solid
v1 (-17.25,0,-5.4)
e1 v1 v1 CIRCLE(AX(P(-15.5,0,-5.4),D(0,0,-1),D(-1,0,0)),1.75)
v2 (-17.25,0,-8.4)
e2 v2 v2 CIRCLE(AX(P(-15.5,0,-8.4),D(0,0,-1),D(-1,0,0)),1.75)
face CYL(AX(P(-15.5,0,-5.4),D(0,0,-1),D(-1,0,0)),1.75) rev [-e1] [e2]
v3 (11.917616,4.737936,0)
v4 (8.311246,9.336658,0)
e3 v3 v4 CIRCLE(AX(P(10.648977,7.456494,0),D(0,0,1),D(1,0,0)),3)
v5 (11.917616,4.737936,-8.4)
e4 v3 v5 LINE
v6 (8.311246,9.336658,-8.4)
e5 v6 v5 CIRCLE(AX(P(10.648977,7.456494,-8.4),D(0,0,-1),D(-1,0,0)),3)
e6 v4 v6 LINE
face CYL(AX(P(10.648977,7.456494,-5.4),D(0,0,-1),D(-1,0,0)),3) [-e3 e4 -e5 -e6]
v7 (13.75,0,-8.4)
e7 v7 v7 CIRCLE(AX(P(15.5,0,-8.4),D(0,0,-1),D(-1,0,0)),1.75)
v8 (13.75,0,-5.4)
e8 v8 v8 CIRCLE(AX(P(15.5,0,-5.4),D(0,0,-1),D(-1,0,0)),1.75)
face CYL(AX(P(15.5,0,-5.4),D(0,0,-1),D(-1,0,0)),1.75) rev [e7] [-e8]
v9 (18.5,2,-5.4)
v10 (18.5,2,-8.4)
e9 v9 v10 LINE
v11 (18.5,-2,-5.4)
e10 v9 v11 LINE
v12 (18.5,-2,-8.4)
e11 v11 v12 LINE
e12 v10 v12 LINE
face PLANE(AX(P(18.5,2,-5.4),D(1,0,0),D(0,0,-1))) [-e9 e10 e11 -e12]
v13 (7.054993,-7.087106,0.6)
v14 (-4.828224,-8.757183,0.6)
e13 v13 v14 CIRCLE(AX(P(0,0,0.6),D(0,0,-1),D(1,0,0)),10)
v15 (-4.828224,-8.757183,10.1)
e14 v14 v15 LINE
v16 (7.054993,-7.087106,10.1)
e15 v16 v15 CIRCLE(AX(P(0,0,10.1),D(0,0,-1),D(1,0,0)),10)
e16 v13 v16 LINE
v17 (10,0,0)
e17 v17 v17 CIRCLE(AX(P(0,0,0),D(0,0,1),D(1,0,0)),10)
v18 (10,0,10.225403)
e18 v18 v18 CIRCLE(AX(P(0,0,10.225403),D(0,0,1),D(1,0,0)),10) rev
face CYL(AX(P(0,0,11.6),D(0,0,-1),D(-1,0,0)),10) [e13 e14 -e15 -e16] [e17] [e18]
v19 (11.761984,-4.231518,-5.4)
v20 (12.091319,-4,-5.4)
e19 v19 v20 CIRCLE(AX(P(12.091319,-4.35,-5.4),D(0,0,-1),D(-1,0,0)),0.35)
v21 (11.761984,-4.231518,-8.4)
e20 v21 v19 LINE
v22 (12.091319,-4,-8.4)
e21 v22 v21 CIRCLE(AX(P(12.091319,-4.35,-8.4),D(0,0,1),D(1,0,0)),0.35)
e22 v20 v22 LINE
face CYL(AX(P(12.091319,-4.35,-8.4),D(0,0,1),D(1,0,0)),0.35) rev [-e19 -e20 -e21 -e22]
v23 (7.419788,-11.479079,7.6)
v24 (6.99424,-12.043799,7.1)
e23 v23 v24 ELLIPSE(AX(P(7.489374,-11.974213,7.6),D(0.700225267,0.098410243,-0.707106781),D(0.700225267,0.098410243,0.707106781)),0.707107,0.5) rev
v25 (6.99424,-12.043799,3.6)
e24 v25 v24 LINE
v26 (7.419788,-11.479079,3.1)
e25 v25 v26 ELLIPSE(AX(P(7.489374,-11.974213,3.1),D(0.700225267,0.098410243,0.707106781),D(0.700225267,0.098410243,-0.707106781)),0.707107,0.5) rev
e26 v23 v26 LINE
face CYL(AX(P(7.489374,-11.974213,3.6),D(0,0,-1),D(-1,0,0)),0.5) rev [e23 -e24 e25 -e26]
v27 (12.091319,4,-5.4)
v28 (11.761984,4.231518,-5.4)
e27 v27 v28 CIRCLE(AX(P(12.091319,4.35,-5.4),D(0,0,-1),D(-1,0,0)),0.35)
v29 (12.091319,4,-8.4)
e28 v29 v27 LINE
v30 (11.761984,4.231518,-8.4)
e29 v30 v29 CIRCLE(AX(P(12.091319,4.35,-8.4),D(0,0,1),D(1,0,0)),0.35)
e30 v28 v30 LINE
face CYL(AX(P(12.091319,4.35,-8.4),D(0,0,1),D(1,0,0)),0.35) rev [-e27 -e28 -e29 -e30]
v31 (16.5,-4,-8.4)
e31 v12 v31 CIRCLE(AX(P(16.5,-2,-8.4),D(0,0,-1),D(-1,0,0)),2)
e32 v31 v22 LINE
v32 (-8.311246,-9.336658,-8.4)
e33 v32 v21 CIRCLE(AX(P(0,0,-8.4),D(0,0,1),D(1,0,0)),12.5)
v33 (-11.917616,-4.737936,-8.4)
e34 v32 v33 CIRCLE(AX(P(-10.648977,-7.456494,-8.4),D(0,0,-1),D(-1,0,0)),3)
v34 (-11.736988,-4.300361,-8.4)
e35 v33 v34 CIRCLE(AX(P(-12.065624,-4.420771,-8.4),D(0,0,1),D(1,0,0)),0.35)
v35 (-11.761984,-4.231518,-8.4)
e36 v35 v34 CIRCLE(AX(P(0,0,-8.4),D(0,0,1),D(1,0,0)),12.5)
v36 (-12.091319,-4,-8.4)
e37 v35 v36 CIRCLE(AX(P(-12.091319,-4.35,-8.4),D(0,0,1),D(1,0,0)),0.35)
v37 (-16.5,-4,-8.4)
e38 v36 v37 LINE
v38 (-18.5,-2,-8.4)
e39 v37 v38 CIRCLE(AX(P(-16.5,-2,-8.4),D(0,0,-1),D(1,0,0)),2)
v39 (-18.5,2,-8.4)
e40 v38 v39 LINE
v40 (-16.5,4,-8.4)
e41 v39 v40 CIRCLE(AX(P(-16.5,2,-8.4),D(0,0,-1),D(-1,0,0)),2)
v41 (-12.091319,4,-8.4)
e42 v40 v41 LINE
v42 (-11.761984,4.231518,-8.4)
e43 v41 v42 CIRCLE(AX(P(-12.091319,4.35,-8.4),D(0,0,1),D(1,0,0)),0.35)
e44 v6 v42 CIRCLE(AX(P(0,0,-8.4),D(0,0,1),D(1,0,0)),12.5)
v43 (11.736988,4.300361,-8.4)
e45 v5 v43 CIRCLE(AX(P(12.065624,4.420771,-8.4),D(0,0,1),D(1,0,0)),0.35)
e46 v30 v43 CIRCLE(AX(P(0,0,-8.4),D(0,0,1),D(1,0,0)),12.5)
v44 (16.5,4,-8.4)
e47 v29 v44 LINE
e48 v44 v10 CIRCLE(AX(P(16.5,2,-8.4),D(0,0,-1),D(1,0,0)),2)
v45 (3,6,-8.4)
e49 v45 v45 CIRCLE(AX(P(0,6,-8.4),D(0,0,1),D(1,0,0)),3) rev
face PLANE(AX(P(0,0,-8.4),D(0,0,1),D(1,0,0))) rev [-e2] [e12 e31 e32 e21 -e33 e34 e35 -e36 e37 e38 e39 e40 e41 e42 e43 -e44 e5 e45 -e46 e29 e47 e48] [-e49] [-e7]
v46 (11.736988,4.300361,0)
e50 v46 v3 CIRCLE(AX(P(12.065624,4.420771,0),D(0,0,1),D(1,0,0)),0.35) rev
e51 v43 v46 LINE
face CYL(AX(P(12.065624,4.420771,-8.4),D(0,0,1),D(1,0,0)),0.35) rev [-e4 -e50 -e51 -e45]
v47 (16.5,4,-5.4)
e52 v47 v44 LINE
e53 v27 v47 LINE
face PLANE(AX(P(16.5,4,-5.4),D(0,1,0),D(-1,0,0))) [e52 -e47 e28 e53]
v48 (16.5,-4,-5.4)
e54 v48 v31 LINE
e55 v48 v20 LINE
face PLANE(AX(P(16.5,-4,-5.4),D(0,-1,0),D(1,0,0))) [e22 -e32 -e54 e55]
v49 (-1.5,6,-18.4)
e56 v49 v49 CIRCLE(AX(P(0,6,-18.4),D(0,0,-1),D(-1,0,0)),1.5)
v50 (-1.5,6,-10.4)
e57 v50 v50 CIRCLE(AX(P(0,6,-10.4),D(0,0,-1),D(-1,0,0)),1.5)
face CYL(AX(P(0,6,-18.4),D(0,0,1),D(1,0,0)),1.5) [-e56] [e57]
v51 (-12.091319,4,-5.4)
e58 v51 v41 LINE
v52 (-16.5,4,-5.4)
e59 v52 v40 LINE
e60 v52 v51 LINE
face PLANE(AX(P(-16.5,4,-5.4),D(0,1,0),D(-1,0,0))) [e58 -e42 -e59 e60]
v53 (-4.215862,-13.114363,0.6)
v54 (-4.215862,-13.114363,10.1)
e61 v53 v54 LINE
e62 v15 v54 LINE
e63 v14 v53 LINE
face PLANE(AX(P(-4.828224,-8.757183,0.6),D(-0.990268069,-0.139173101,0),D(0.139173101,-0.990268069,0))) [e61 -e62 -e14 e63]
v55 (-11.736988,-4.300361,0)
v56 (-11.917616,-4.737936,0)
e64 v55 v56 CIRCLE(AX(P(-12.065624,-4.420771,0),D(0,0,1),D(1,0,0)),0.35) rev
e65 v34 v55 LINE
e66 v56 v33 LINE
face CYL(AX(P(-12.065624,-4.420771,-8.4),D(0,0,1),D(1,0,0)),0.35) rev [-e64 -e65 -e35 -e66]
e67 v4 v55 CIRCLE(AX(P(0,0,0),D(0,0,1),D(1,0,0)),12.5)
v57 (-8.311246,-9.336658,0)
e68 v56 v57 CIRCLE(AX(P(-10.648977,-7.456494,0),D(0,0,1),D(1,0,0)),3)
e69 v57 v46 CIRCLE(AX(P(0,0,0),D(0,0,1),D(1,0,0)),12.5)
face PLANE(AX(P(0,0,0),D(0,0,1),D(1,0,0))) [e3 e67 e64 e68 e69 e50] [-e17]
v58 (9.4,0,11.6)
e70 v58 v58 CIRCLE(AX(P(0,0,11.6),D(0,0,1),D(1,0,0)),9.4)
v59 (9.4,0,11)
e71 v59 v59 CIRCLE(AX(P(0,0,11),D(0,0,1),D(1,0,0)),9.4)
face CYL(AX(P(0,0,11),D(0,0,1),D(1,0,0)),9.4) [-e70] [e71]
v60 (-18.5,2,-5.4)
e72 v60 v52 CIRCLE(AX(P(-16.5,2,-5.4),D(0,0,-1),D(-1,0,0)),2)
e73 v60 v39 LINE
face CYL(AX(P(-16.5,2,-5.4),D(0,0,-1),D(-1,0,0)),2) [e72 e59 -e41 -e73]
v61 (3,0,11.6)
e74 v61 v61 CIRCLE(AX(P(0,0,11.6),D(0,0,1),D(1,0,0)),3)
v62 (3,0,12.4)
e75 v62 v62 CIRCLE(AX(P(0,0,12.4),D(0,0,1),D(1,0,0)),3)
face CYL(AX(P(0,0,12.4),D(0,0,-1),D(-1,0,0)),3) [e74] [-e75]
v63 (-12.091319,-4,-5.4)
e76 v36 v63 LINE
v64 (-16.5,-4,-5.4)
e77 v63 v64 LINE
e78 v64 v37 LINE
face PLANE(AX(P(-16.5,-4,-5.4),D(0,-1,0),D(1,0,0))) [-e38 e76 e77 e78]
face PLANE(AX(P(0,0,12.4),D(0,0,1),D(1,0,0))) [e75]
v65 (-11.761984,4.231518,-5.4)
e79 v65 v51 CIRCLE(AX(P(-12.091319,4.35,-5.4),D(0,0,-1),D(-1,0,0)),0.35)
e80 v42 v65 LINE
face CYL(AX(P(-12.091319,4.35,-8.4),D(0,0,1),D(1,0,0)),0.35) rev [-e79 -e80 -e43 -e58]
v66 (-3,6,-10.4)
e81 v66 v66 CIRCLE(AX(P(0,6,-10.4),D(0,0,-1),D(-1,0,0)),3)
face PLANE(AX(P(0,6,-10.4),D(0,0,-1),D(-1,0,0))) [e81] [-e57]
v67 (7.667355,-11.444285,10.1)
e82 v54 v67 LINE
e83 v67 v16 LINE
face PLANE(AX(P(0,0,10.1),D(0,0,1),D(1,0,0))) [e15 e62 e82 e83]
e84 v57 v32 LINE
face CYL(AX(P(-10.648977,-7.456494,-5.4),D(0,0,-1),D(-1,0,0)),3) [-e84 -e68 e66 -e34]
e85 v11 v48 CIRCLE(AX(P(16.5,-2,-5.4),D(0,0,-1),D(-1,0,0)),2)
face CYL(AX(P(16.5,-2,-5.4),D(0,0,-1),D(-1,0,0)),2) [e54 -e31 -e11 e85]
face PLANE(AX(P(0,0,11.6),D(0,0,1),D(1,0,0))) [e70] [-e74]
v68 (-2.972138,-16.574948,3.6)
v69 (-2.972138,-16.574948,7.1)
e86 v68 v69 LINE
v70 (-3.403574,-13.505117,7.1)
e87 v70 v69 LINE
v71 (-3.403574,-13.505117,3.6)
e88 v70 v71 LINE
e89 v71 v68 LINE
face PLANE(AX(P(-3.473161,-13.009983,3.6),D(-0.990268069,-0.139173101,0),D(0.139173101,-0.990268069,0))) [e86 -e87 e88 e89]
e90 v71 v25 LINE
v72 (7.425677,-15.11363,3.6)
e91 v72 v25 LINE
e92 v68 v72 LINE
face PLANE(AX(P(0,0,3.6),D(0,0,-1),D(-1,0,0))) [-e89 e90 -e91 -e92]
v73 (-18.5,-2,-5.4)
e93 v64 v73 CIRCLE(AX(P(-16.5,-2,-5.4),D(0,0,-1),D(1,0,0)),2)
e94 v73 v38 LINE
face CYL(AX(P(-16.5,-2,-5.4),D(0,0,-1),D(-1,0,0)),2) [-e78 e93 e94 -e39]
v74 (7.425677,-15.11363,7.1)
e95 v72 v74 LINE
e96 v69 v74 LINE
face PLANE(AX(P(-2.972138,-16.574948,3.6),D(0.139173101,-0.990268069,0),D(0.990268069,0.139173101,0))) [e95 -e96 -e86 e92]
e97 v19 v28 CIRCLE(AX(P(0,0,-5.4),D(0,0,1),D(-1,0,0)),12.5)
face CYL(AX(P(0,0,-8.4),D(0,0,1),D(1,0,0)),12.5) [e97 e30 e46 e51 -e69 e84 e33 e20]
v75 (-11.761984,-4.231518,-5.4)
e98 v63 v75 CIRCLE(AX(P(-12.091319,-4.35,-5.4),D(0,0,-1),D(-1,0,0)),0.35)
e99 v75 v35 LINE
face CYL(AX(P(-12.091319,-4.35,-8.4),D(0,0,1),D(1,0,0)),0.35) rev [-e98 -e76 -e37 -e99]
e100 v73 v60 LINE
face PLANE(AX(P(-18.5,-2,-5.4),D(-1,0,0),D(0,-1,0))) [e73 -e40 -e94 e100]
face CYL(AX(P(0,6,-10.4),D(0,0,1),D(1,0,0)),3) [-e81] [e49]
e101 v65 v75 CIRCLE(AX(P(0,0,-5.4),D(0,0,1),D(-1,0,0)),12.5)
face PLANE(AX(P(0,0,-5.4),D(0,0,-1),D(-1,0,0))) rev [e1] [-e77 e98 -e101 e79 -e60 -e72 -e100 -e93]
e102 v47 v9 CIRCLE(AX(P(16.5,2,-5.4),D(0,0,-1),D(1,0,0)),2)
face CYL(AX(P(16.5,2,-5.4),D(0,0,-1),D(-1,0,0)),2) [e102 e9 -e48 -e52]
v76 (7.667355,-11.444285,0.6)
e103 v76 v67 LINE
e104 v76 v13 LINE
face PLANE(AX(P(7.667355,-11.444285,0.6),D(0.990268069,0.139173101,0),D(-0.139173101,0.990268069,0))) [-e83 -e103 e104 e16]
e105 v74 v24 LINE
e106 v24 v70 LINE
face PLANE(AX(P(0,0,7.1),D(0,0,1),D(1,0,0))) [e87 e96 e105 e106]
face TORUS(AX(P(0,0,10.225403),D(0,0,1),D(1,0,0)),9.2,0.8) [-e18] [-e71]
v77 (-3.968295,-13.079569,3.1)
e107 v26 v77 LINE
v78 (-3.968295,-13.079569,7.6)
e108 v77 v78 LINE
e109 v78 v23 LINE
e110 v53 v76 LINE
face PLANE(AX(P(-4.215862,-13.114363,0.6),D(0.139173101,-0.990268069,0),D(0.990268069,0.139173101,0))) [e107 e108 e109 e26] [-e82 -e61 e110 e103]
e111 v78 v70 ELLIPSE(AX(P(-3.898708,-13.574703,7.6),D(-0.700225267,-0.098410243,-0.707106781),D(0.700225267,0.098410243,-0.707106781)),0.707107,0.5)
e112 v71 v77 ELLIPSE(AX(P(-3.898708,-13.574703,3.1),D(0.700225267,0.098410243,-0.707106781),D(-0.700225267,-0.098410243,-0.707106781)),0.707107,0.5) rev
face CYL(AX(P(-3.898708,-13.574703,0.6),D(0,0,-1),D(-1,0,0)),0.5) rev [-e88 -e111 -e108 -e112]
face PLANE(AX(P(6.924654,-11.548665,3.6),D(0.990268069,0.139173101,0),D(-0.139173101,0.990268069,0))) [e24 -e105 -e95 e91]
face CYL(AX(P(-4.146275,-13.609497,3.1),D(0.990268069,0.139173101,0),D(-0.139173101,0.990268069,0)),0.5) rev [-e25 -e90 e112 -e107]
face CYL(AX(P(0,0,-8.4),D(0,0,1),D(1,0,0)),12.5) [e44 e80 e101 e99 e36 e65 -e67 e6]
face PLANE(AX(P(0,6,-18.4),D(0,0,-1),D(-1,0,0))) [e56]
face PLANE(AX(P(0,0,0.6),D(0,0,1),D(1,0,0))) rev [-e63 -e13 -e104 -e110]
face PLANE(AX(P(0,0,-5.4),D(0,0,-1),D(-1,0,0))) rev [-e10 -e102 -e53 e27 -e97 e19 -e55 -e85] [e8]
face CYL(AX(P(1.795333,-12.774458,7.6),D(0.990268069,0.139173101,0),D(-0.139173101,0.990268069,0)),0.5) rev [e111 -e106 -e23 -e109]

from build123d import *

# Parameters (mm, degrees)
SKETCH_1_R          = 10
EXTRUDE_1_DEPTH     = 11.6
SKETCH_2_R          = 12.5
EXTRUDE_2_DEPTH     = 8.4
EXTRUDE_START       = -3
SKETCH_3_R          = 1.75
SKETCH_3_R_2        = 1.749999999999227
EXTRUDE_3_DEPTH     = 3
EXTRUDE_START_2     = 5.4
EXTRUDE_4_DEPTH     = 5.4
SKETCH_5_R          = 3.000000000000001
EXTRUDE_5_DEPTH     = 2
SKETCH_6_R          = 1.5000000000000002
EXTRUDE_6_DEPTH     = 8
SKETCH_7_R          = 3
EXTRUDE_7_DEPTH     = 0.8
EXTRUDE_START_3     = -11
EXTRUDE_8_DEPTH     = 11
EXTRUDE_9_DEPTH     = 8
CUT_EXTRUDE_1_DEPTH = 4.5
FILLET_1_R          = 0.5
FILLET_4_R          = 0.35
CUT_EXTRUDE_START   = -1.5
CUT_EXTRUDE_2_DEPTH = 1.5
CUT_EXTRUDE_START_2 = -0.6
SKETCH_12_R         = 10
SKETCH_12_R_2       = 9.4
CUT_EXTRUDE_3_DEPTH = 0.6
FILLET_5_R          = 0.8


with BuildPart() as part:
    # ｽｹｯﾁ1 → ﾎﾞｽ - 押し出し1 (new body)
    with BuildSketch(Plane.XY):
        Circle(SKETCH_1_R)
    extrude(amount=EXTRUDE_1_DEPTH)

    # ｽｹｯﾁ2 → ﾎﾞｽ - 押し出し2 (add)
    with BuildSketch(Plane.XY):
        Circle(SKETCH_2_R)
    extrude(amount=-EXTRUDE_2_DEPTH)

    # ｽｹｯﾁ3 → ﾎﾞｽ - 押し出し3 (add)
    # profile 1 of 4: a face of its own
    with BuildSketch(Plane(origin=(0, 0, -8.4), x_dir=(-1, 0, 0), z_dir=(0, 0, -1)).offset(EXTRUDE_START)):
        with BuildLine():
            Line((-18.500000000000004, 2.0000000000000004), (-18.500000000000004, -2.0000000000000004))
            ThreePointArc((-18.500000000000004, -2.0000000000000004), (-17.914213562373096, -3.4142135623730976), (-16.5, -4))
            Line((-16.5, -4), (-11.842719282327012, -4.000000000000001))
            ThreePointArc((-11.842719282327012, -4.000000000000001), (-12.500000000000002, 1.53e-15), (-11.842719282327012, 4.000000000000001))
            Line((-11.842719282327012, 4.000000000000001), (-16.5, 4))
            ThreePointArc((-16.5, 4), (-17.914213562373096, 3.4142135623730976), (-18.500000000000004, 2.0000000000000004))
        make_face()
        with Locations((-15.5, 0)):
            Circle(SKETCH_3_R, mode=Mode.SUBTRACT)
    # profile 2 of 4: a face of its own
    with BuildSketch(Plane(origin=(0, 0, -8.4), x_dir=(-1, 0, 0), z_dir=(0, 0, -1)).offset(EXTRUDE_START)):
        with BuildLine():
            Line((16.50000000000071, 3.999999999997067), (11.842719282327723, 3.999999999997894))
            ThreePointArc((11.842719282327723, 3.999999999997894), (12.500000000000002, -2.22183e-12), (11.842719282326302, -4.000000000002104))
            Line((11.842719282326302, -4.000000000002104), (16.49999999999929, -4.000000000002934))
            ThreePointArc((16.49999999999929, -4.000000000002934), (17.914213562372492, -3.414213562376281), (18.49999999999965, -2.000000000003289))
            Line((18.49999999999965, -2.000000000003289), (18.500000000000355, 1.999999999996712))
            ThreePointArc((18.500000000000355, 1.999999999996712), (17.9142135623737, 3.414213562369911), (16.50000000000071, 3.999999999997067))
        make_face()
        with Locations((15.5, -2.75525e-12)):
            Circle(SKETCH_3_R_2, mode=Mode.SUBTRACT)
    # profile 3 of 4: a face of its own
    with BuildSketch(Plane(origin=(0, 0, -8.4), x_dir=(-1, 0, 0), z_dir=(0, 0, -1)).offset(EXTRUDE_START)):
        with BuildLine():
            ThreePointArc((-8.311246450809406, 9.336657990625344), (-10.239400553612443, 7.1697054543880165), (-11.616202318913265, 4.616691855222107))
            ThreePointArc((-11.616202318913265, 4.616691855222107), (-13.106432708623924, 9.177222981616662), (-8.311246450809406, 9.336657990625344))
        make_face()
    # profile 4 of 4: a face of its own
    with BuildSketch(Plane(origin=(0, 0, -8.4), x_dir=(-1, 0, 0), z_dir=(0, 0, -1)).offset(EXTRUDE_START)):
        with BuildLine():
            ThreePointArc((8.311246450807749, -9.33665799062682), (10.239400553611166, -7.169705454389839), (11.616202318912443, -4.6166918552241745))
            ThreePointArc((11.616202318912443, -4.6166918552241745), (13.106432708622291, -9.177222981618991), (8.311246450807749, -9.33665799062682))
        make_face()
    extrude(amount=EXTRUDE_3_DEPTH)

    # ｽｹｯﾁ4 → ﾎﾞｽ - 押し出し4 (add)
    with BuildSketch(Plane.XY.offset(-5.400000000000001).offset(EXTRUDE_START_2)):
        with BuildLine():
            ThreePointArc((-11.616202318912443, -4.616691855224174), (-13.10643270862229, -9.17722298161899), (-8.311246450807749, -9.336657990626819))
            ThreePointArc((-8.311246450807749, -9.336657990626819), (-10.239400553611167, -7.169705454389835), (-11.616202318912443, -4.616691855224174))
        make_face()
        with BuildLine():
            ThreePointArc((11.616202318913265, 4.616691855222107), (13.106432708623922, 9.177222981616662), (8.311246450809406, 9.336657990625344))
            ThreePointArc((8.311246450809406, 9.336657990625344), (10.23940055361244, 7.169705454388018), (11.616202318913265, 4.616691855222107))
        make_face()
    extrude(amount=-EXTRUDE_4_DEPTH)

    # ｽｹｯﾁ5 → ﾎﾞｽ - 押し出し5 (add)
    with BuildSketch(Plane(origin=(0, 0, -8.4), x_dir=(-1, 0, 0), z_dir=(0, 0, -1))):
        with Locations(Location((1.1e-16, 6, 0), (0, 0, 180))):
            Circle(SKETCH_5_R)
    extrude(amount=EXTRUDE_5_DEPTH)

    # ｽｹｯﾁ6 → ﾎﾞｽ - 押し出し6 (add)
    with BuildSketch(Plane(origin=(0, 0, -10.400000000000002), x_dir=(-1, 0, 0), z_dir=(0, 0, -1))):
        with Locations((1.1e-16, 6)):
            Circle(SKETCH_6_R)
    extrude(amount=EXTRUDE_6_DEPTH)

    # ｽｹｯﾁ7 → ﾎﾞｽ - 押し出し7 (add)
    with BuildSketch(Plane.XY.offset(11.6)):
        Circle(SKETCH_7_R)
    extrude(amount=EXTRUDE_7_DEPTH)

    # ｽｹｯﾁ8 → ﾎﾞｽ - 押し出し8 (add)
    with BuildSketch(Plane.XY.offset(11.6).offset(EXTRUDE_START_3)):
        with BuildLine():
            Line((-4.215861960544603, -13.114362658155867), (7.667354864354238, -11.444285446635076))
            Line((7.667354864354238, -11.444285446635076), (7.054993220129948, -7.087105944172167))
            ThreePointArc((7.054993220129948, -7.087105944172167), (1.3917310096006568, -9.902680687415703), (-4.828223604768894, -8.757183155692958))
            Line((-4.828223604768894, -8.757183155692958), (-4.215861960544603, -13.114362658155867))
        make_face()
    extrude(amount=EXTRUDE_8_DEPTH)

    # ｽｹｯﾁ9 → ﾎﾞｽ - 押し出し9 (add)
    with BuildSketch(Plane.XY.offset(11.6)):
        Polygon((-3.4731609089884254, -13.009982832435817), (-2.9721377455321845, -16.57494787990548), (7.4256769762543025, -15.113630319824779), (6.924653812798063, -11.548665272355127), align=None)
    extrude(amount=-EXTRUDE_9_DEPTH)

    # ｽｹｯﾁ10 → ｶｯﾄ - 押し出し1 (cut)
    with BuildSketch(Plane.XY.offset(11.6)):
        Polygon((6.924653812798063, -11.548665272355127), (-3.4731609089884254, -13.009982832435817), (-2.9721377455321845, -16.57494787990548), (7.4256769762543025, -15.113630319824779), align=None)
    extrude(amount=-CUT_EXTRUDE_1_DEPTH, mode=Mode.SUBTRACT)

    # ﾌｨﾚｯﾄ1
    fillet_1_edges = [part.edges().sort_by_distance(p)[0] for p in [
        (1.7257464519048185, -12.279324052395472, 3.5999999999999996),
        (-3.4731609089884254, -13.009982832435817, 5.35),
        (6.924653812798063, -11.548665272355127, 5.35),
        (1.7257464519048185, -12.279324052395472, 7.1),
    ]]
    fillet(fillet_1_edges, radius=FILLET_1_R)

    # ﾌｨﾚｯﾄ4
    fillet_4_edges = [part.edges().sort_by_distance(p)[0] for p in [
        (11.616202318913265, 4.616691855222108, -4.200000000000001),
        (11.84271928232701, 4.000000000000002, -6.9),
        (11.84271928232701, -4.000000000000001, -6.9),
        (-11.616202318912443, -4.6166918552241745, -4.2),
        (-11.8427192823263, -4.000000000002105, -6.9),
        (-11.842719282327721, 3.999999999997894, -6.9),
    ]]
    fillet(fillet_4_edges, radius=FILLET_4_R)

    # ｽｹｯﾁ11 → ｶｯﾄ - 押し出し2 (cut)
    with BuildSketch(Plane.XY.offset(11.6).offset(CUT_EXTRUDE_START)):
        with BuildLine():
            Line((-4.828223604768897, -8.757183155692957), (-4.215861960544603, -13.114362658155867))
            Line((-4.215861960544603, -13.114362658155867), (7.667354864354238, -11.444285446635076))
            Line((7.667354864354238, -11.444285446635076), (7.054993220129944, -7.087105944172171))
            ThreePointArc((7.054993220129944, -7.087105944172171), (1.3917310096006545, -9.902680687415703), (-4.828223604768897, -8.757183155692957))
        make_face()
    extrude(amount=CUT_EXTRUDE_2_DEPTH, mode=Mode.SUBTRACT)

    # ｽｹｯﾁ12 → ｶｯﾄ - 押し出し3 (cut)
    with BuildSketch(Plane.XY.offset(11.6).offset(CUT_EXTRUDE_START_2)):
        Circle(SKETCH_12_R)
        Circle(SKETCH_12_R_2, mode=Mode.SUBTRACT)
    extrude(amount=CUT_EXTRUDE_3_DEPTH, mode=Mode.SUBTRACT)

    # ﾌｨﾚｯﾄ5
    # the kernel refuses this fillet: 0.8 mm, written as the material it takes off along each edge
    with BuildSketch(Plane(origin=(0, 0, 11), x_dir=(0.7054993220130121, -0.7087105944171995, 0), z_dir=(-0.7087105944171995, -0.7054993220130121, 0))) as fillet_5_piece_1:
        with BuildLine():
            CenterArc((9.200000000000001, -0.7745966692414843), FILLET_5_R, 0, 75.52248781407015)
            Line((9.4, 0), (9.404000000000002, 0.01549193338482979))
            ThreePointArc((9.404000000000002, 0.01549193338482979), (9.700000000000001, 0.01600000000000001), (10, 0.01600000000000001))
            Line((10, 0.01600000000000001), (10.016, 0))
            Line((10.016, 0), (10.016, -0.7745966692414843))
            Line((10.016, -0.7745966692414843), (10, -0.7745966692414843))
        make_face()
    revolve(axis=Axis((0, 0, 11), (0, 0, 1)), revolution_arc=45.130102354154545, mode=Mode.SUBTRACT)
    with BuildSketch(Plane(origin=(0, 0, 11), x_dir=(-0.48282236047689747, -0.8757183155692913, 0), z_dir=(-0.8757183155692913, 0.48282236047689747, 0))) as fillet_5_piece_2:
        with BuildLine():
            CenterArc((9.200000000000001, -0.7745966692414824), FILLET_5_R, 0, 75.52248781407025)
            Line((10.000000000000002, -0.7745966692414824), (10.016000000000002, -0.7745966692414824))
            Line((10.016000000000002, -0.7745966692414824), (10.016, 0))
            Line((10.016, 0), (10, 0.01600000000000001))
            ThreePointArc((10, 0.01600000000000001), (9.699999999999998, 0.01600000000000001), (9.404, 0.01549193338483157))
            Line((9.404, 0.01549193338483157), (9.399999999999999, 1.78e-15))
        make_face()
    revolve(axis=Axis((0, 0, 11), (0, 0, 1)), revolution_arc=73.73979529168996, mode=Mode.SUBTRACT)
    with BuildSketch(Plane(origin=(0, 0, 11), x_dir=(1, 0, 0), z_dir=(0, -1, 0))) as fillet_5_piece_3:
        with BuildLine():
            CenterArc((9.2, -0.7745966692414825), FILLET_5_R, 0, 75.52248781406999)
            Line((9.4, 0), (9.404, 0.01549193338482979))
            ThreePointArc((9.404, 0.01549193338482979), (9.7, 0.01600000000000001), (10, 0.01600000000000001))
            Line((10, 0.01600000000000001), (10.016, 0))
            Line((10.016, 0), (10.016, -0.7745966692414825))
            Line((10.016, -0.7745966692414825), (10, -0.7745966692414825))
        make_face()
    revolve(axis=Axis((0, 0, 11), (0, 0, 1)), revolution_arc=241.1301023541555, mode=Mode.SUBTRACT)


solid = part.part
